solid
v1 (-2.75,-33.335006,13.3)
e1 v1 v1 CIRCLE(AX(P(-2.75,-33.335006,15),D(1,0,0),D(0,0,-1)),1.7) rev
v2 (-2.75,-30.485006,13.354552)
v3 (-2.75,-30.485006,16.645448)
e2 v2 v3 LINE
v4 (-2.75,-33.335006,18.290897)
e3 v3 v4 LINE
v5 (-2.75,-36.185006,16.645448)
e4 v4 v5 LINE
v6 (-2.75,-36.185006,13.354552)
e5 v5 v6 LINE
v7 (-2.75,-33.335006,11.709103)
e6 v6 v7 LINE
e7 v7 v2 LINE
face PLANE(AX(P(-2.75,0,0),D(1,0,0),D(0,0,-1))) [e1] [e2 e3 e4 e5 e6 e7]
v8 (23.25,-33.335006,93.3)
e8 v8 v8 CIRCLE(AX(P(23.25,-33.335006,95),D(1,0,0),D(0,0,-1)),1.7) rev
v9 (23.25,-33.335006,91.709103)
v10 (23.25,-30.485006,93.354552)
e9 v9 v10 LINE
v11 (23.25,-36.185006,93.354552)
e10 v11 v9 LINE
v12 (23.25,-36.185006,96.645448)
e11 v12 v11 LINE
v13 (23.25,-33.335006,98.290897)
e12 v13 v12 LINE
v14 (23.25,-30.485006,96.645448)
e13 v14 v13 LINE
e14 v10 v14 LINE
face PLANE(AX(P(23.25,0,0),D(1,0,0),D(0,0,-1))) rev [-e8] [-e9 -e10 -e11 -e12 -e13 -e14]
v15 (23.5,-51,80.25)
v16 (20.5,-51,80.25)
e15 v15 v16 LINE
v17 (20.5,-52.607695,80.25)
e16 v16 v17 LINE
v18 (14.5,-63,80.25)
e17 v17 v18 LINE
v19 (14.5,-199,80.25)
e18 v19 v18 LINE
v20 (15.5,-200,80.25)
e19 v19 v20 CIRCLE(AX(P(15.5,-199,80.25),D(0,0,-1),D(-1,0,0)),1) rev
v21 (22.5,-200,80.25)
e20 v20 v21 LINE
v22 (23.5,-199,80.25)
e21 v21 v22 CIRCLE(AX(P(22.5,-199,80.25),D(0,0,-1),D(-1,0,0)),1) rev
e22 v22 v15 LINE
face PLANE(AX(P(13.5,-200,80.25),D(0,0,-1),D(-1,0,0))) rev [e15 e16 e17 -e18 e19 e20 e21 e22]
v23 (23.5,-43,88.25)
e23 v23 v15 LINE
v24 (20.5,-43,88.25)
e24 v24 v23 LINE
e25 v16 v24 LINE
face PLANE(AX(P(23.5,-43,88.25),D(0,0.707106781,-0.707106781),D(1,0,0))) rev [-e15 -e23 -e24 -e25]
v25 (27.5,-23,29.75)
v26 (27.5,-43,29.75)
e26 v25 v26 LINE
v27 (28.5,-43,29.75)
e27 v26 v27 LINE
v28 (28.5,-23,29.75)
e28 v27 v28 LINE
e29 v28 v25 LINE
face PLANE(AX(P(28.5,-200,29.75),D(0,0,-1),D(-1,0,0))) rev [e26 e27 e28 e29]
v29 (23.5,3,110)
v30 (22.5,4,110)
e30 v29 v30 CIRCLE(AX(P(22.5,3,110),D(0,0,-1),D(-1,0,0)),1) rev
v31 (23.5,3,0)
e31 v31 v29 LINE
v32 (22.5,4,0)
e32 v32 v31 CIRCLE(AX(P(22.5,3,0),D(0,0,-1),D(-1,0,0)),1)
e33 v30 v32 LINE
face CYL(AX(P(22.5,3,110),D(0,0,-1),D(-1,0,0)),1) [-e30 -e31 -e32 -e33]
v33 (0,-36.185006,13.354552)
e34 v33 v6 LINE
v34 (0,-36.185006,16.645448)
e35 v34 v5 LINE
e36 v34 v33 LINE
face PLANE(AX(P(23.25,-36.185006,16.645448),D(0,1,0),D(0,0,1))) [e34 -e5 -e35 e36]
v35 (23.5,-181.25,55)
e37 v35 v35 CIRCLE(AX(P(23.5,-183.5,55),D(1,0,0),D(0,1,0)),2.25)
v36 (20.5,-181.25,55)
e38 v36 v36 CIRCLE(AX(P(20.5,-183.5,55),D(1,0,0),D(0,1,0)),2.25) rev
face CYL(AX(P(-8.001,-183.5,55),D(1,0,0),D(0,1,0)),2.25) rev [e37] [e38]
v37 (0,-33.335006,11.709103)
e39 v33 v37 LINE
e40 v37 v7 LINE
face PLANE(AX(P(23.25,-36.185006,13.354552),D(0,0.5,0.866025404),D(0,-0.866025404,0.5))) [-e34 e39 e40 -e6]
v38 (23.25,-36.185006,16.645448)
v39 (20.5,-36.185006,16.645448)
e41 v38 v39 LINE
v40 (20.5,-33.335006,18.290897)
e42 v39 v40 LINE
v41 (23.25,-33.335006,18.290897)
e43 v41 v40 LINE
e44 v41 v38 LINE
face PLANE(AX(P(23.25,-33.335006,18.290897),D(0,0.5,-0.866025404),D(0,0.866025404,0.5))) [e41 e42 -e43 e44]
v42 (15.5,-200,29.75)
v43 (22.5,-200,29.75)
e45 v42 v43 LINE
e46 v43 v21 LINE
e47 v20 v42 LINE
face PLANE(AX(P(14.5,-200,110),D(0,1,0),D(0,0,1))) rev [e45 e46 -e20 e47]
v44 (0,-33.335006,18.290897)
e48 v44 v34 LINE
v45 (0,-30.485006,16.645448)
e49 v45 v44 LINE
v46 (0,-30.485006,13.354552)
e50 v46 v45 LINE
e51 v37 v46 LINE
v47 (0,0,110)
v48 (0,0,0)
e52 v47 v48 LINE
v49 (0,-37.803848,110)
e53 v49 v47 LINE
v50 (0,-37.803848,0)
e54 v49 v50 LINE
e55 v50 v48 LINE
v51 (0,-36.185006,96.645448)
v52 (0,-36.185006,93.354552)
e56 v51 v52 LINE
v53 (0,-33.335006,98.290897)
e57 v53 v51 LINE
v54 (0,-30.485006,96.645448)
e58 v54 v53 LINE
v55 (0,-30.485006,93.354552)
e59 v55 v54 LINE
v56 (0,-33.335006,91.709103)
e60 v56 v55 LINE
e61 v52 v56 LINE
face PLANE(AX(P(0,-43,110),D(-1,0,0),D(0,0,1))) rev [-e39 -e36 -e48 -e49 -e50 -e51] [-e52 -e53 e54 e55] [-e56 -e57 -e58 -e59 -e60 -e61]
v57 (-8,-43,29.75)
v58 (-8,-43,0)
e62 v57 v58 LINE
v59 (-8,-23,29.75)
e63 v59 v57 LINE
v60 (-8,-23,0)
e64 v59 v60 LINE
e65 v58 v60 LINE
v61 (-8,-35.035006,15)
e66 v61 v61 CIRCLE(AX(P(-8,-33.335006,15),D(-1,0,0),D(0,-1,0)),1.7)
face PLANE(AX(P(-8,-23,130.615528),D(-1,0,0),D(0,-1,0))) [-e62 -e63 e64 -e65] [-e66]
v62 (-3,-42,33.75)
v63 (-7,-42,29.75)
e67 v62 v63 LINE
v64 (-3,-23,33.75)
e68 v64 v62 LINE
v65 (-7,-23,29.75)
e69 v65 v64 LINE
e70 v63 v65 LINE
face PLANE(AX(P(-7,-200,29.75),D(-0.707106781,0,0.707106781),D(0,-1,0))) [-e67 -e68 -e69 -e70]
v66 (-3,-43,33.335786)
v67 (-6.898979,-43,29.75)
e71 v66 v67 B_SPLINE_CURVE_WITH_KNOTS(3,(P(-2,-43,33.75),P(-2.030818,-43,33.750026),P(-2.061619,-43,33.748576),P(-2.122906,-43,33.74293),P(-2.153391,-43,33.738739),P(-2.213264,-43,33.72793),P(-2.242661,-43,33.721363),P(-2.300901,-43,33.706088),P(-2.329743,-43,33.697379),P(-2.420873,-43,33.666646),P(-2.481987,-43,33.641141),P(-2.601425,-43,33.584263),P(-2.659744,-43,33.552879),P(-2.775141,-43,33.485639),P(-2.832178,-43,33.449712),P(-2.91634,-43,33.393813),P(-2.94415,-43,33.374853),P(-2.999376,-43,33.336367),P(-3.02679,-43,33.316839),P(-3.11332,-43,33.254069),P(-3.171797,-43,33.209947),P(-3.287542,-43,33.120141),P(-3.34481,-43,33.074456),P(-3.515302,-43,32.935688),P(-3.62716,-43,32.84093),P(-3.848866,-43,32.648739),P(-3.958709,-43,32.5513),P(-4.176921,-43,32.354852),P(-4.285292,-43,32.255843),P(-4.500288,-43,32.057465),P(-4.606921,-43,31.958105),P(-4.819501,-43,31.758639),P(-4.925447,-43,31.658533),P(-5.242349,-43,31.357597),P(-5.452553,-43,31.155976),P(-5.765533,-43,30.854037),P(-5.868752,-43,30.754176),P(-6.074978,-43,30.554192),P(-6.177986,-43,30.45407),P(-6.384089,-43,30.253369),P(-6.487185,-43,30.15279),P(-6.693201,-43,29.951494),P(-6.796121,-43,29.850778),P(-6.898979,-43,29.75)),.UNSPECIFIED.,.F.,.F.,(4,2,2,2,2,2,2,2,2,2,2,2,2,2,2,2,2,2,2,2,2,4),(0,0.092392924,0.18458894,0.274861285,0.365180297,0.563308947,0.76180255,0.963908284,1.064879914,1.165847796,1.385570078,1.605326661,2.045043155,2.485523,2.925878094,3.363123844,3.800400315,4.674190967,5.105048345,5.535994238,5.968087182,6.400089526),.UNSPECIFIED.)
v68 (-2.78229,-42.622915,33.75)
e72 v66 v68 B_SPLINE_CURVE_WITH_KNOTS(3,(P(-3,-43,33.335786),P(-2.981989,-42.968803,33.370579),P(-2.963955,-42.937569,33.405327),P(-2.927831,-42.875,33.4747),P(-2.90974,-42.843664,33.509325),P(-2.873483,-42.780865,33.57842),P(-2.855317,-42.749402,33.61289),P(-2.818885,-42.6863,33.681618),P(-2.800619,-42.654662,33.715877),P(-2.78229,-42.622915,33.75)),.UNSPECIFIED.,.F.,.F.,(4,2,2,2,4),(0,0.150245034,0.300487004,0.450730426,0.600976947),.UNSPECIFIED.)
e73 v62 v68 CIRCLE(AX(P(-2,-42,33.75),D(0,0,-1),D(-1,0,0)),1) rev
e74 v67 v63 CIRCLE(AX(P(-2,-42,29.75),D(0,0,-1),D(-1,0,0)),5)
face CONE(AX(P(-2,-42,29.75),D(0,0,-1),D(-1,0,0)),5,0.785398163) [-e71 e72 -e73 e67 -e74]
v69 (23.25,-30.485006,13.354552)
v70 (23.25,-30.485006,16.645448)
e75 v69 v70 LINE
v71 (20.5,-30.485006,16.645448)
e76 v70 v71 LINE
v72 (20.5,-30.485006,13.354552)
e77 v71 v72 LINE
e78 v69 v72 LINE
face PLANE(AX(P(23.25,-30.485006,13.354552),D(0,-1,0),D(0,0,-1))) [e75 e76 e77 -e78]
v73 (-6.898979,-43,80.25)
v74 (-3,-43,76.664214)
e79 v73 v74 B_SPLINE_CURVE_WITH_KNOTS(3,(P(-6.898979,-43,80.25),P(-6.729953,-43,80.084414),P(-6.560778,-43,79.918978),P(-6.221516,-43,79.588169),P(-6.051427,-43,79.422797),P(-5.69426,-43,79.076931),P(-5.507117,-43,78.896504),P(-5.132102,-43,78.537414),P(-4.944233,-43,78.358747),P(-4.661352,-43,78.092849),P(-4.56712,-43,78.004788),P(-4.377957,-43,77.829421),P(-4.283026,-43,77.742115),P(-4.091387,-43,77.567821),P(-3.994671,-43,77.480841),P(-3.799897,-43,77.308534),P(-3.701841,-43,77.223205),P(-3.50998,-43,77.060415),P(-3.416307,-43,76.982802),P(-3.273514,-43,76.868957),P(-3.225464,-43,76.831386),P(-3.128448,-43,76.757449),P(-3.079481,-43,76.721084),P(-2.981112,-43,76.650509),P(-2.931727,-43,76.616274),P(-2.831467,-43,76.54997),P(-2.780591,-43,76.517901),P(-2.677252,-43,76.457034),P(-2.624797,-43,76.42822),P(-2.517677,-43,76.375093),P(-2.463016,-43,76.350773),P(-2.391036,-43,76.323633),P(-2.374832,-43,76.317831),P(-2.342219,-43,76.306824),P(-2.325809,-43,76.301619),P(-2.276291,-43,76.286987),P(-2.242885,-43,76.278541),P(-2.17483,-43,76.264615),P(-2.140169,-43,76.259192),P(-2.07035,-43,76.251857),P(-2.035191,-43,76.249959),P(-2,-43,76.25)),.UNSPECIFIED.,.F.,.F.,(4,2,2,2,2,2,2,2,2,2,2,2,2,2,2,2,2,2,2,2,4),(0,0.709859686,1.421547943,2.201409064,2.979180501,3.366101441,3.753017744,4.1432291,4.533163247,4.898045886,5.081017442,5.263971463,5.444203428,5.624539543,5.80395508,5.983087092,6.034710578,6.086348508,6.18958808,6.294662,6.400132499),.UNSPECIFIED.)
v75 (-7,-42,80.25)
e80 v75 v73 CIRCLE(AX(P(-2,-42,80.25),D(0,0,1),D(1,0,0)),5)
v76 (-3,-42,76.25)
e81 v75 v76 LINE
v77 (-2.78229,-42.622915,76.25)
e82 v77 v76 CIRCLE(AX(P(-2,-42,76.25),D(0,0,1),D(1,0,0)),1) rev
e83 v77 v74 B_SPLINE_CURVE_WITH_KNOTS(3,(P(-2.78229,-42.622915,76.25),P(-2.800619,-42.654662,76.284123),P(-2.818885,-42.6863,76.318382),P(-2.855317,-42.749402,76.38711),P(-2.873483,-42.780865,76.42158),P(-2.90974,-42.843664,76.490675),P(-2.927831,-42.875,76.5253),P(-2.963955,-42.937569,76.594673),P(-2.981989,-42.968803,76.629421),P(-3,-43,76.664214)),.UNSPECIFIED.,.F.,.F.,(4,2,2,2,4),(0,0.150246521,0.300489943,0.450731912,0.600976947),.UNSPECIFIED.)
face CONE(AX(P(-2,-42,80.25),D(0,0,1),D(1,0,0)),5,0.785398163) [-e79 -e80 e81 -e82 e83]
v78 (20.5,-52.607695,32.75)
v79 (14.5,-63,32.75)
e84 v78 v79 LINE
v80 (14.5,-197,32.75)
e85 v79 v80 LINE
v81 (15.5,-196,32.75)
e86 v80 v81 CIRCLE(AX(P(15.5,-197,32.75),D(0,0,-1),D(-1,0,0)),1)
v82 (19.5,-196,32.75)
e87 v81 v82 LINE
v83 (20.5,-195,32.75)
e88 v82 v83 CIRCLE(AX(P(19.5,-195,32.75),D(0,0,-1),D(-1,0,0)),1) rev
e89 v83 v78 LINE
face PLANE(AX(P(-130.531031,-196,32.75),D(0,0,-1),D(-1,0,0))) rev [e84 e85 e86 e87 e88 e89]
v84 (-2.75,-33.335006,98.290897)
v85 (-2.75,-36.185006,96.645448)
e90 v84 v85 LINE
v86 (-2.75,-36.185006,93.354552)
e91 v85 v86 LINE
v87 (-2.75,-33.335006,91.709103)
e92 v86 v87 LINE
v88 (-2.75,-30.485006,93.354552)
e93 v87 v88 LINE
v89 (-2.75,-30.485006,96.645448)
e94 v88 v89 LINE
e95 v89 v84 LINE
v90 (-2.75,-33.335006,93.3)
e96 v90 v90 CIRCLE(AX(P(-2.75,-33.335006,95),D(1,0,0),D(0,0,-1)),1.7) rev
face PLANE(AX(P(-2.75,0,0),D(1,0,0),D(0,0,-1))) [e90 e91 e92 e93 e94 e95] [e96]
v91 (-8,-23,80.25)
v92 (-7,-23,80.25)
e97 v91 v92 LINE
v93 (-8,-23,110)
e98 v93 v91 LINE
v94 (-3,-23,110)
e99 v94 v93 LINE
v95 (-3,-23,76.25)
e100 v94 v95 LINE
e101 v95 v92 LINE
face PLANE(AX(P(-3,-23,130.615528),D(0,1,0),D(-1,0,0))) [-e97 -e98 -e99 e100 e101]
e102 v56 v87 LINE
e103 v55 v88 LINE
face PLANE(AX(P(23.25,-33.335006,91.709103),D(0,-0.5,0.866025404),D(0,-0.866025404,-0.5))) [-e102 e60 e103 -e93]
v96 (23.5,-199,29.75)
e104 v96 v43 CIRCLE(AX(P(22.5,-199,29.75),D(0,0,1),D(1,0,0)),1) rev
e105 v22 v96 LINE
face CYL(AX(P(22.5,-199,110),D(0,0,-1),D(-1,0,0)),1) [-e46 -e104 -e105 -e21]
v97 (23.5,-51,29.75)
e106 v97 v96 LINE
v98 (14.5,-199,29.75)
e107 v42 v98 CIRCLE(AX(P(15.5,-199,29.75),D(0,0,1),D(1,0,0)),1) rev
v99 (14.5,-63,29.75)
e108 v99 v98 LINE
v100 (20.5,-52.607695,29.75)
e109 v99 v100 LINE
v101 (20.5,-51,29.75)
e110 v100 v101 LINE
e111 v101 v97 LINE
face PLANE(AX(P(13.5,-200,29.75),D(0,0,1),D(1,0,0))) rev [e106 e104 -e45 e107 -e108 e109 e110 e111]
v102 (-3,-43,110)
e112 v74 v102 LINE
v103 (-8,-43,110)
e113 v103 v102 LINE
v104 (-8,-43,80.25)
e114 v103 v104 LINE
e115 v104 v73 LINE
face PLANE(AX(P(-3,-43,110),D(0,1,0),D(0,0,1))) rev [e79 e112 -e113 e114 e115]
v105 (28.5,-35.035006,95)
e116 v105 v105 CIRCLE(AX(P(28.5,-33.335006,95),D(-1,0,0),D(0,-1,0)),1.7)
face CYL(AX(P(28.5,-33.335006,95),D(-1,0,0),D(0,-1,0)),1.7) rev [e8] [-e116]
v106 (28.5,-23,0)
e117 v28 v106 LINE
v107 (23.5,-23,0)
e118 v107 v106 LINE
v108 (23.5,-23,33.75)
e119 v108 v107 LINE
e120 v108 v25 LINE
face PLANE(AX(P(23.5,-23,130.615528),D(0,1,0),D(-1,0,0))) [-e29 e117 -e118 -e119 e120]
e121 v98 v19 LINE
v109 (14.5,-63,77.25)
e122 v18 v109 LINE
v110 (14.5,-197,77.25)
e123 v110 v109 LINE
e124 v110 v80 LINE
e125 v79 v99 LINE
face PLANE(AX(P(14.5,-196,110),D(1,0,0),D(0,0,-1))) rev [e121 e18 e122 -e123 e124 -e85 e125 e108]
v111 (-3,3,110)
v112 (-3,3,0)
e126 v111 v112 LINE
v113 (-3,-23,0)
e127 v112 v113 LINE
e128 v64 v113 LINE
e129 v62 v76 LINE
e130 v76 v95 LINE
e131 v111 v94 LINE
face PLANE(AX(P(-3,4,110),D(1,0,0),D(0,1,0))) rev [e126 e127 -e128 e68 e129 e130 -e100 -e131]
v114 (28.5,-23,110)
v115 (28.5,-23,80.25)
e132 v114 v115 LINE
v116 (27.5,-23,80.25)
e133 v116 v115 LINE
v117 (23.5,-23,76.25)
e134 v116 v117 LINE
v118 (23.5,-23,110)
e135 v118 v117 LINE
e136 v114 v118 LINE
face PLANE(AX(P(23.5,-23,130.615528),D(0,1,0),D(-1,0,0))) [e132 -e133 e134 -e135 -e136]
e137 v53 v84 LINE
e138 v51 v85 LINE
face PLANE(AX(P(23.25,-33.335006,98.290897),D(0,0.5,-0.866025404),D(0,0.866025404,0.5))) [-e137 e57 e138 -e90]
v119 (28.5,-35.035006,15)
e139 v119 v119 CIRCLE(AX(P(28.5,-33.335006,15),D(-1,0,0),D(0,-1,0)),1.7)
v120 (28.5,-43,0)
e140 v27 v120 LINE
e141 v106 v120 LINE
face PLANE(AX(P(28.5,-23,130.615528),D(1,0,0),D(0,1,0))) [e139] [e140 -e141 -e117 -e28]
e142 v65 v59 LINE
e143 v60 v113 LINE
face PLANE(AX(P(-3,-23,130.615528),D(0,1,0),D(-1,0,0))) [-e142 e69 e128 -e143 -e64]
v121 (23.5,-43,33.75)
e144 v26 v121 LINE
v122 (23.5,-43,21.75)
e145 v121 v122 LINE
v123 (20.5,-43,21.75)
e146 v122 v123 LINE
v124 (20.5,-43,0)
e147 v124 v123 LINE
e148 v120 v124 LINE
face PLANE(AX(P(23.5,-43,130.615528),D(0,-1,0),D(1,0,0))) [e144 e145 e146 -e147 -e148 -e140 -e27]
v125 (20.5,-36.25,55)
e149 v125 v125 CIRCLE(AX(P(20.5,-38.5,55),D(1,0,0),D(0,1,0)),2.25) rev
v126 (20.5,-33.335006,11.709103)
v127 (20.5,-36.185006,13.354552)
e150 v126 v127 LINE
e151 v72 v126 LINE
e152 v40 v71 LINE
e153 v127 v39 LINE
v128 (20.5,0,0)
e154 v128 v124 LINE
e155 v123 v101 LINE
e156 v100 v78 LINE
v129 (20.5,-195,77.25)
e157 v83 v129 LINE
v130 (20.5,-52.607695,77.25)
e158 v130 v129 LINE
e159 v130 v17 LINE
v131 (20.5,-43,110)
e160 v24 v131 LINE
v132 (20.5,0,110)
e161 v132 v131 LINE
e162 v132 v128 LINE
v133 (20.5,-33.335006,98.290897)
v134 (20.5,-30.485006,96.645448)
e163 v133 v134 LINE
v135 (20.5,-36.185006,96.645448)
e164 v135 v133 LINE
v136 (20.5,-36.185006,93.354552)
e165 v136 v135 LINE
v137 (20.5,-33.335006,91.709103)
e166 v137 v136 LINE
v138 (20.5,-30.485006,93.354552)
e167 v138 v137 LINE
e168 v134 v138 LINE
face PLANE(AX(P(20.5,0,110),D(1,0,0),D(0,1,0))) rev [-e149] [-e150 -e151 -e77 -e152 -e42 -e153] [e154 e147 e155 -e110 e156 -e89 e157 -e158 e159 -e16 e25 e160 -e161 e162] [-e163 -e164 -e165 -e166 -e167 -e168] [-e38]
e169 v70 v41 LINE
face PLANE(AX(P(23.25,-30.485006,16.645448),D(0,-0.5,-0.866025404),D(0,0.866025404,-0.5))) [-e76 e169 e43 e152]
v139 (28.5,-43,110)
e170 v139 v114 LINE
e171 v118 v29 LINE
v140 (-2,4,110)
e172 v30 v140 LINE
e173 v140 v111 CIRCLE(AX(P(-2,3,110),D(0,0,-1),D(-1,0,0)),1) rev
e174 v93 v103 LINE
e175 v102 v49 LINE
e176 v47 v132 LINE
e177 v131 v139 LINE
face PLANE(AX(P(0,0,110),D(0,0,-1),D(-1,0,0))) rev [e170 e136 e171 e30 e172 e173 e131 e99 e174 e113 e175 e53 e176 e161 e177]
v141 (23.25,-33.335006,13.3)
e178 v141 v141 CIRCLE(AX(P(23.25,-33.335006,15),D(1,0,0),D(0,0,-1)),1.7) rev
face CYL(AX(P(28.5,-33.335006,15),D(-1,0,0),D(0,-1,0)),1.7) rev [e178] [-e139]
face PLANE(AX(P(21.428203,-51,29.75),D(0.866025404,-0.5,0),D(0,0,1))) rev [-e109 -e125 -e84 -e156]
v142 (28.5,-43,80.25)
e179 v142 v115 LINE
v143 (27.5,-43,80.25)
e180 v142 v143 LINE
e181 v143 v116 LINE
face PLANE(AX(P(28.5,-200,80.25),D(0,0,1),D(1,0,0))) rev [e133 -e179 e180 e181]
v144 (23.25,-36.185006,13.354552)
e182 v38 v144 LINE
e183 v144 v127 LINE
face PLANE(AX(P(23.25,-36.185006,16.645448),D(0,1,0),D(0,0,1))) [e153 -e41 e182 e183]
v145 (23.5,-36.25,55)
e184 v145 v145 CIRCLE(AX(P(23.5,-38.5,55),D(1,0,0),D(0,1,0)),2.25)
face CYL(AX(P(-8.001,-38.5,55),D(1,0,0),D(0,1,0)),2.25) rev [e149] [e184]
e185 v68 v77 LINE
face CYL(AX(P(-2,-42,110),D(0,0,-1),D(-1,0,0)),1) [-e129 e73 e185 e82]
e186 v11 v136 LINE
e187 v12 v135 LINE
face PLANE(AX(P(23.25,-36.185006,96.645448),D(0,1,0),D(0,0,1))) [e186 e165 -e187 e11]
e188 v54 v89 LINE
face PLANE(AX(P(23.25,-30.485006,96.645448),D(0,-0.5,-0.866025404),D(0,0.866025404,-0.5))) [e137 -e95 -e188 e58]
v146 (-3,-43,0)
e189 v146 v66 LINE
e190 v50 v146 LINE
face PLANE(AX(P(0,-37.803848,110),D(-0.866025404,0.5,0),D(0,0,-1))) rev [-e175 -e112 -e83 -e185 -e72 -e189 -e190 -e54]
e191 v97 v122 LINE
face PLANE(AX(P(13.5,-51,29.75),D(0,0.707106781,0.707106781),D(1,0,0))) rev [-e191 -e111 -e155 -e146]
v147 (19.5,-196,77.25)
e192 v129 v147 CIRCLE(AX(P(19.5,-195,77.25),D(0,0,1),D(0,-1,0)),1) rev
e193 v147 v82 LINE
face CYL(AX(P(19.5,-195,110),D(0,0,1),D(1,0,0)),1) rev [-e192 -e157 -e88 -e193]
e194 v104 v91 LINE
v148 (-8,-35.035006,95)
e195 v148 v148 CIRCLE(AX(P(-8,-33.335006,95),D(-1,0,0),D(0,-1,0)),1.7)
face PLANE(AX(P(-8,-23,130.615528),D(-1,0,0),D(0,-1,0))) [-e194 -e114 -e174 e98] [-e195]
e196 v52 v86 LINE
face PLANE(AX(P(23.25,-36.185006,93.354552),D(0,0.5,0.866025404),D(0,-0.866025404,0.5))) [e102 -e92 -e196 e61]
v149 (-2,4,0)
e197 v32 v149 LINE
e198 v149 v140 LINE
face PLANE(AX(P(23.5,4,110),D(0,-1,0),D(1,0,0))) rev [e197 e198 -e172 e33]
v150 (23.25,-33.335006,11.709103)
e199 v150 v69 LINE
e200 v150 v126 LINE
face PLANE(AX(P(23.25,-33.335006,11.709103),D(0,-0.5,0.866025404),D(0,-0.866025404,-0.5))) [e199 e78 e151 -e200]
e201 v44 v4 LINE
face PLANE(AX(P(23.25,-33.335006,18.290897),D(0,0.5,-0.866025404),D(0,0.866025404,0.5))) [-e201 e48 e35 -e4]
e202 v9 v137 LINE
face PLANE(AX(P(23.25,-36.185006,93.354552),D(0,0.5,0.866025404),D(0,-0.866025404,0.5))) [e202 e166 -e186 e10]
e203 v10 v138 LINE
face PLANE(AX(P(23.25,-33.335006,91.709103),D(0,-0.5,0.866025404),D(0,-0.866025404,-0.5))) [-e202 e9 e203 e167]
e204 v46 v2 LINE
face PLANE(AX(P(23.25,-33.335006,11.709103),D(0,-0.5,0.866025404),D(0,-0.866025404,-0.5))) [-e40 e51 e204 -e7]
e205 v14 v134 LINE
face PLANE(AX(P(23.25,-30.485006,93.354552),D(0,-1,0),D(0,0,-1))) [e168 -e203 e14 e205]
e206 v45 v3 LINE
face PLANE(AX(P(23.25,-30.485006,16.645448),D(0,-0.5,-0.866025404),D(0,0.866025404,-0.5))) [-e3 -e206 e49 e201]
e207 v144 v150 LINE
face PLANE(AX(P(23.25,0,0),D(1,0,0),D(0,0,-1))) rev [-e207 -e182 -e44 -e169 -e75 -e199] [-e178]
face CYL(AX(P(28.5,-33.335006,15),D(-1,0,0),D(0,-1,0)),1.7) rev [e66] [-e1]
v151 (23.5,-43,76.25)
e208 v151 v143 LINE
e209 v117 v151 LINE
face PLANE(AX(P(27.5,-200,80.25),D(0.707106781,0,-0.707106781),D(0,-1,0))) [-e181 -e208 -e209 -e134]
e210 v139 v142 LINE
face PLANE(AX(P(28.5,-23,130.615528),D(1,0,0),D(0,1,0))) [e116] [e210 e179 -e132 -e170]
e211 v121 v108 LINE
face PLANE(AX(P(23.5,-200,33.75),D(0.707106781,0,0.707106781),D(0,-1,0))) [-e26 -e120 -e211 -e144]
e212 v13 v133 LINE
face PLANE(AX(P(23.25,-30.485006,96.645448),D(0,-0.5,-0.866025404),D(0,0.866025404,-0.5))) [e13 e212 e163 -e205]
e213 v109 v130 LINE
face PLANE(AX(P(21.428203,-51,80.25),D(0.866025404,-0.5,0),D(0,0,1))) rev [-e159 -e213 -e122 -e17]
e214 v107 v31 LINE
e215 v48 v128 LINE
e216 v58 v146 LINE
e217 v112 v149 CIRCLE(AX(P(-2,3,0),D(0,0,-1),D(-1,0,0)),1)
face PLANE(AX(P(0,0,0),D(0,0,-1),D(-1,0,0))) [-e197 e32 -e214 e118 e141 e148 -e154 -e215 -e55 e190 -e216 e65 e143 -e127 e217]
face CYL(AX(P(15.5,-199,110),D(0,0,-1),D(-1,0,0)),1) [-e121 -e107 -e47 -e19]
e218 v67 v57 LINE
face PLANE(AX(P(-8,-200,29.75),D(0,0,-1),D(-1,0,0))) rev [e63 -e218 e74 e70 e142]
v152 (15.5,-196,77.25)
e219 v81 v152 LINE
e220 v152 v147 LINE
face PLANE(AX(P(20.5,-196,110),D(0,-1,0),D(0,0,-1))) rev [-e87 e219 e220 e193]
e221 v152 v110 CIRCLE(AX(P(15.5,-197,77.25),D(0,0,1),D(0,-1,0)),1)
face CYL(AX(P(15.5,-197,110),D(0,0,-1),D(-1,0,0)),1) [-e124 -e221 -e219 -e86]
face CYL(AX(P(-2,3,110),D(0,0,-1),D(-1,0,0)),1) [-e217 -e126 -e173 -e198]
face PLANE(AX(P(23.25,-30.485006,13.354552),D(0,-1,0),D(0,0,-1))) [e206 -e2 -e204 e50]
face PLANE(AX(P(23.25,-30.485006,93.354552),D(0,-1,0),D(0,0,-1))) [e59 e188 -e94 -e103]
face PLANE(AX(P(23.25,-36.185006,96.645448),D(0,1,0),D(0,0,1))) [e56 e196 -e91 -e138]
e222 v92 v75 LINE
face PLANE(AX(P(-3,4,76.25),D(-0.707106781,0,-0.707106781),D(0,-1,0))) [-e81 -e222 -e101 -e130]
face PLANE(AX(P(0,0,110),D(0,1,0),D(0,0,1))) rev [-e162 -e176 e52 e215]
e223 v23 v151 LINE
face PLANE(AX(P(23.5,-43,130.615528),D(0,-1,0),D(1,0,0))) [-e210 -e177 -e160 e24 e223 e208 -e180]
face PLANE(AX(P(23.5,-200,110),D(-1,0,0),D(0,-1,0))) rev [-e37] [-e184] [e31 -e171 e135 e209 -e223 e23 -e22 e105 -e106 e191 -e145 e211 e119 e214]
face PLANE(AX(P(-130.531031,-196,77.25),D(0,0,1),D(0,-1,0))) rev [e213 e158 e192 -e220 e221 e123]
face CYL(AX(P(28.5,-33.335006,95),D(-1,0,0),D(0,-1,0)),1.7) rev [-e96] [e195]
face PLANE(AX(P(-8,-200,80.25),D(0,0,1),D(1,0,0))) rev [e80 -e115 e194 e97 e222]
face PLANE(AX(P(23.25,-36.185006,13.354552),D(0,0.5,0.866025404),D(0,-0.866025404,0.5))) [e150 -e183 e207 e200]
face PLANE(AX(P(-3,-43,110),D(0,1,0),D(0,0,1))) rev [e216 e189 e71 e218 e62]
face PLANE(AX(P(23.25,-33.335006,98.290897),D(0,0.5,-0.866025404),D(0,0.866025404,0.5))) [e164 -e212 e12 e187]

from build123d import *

# Parameters (mm, degrees)
EXTRUDE_1_DEPTH          = 110
SKETCH_3_W               = 5
SKETCH_3_H               = 20
EXTRUDE_2_DEPTH          = 110
CUT_EXTRUDE_1_REACH      = 232.418
SKETCH_2_R               = 2.25
SKETCH_5_W               = 5
SKETCH_5_H               = 50.5
CUT_EXTRUDE_2_DEPTH      = 234.512847612
SKETCH_6_W               = 29.75
SKETCH_6_H               = 157
CUT_EXTRUDE_3_DEPTH      = 10
SKETCH_7_W               = 3
SKETCH_7_H               = 145
EXTRUDE_3_DEPTH          = 6
FILLET_1_R               = 1
CHAMFER_1_SIZE           = 8
CHAMFER_2_SIZE           = 4
SKETCH_8_R               = 1.7
CUT_EXTRUDE_4_DEPTH      = 232.154169333
CUT_EXTRUDE_5_DEPTH      = 13
CUT_EXTRUDE_5_DEPTH_BACK = 13
CHAMFER_3_SIZE           = 12
CHAMFER_3_SIZE_2         = 6.92820323
CHAMFER_4_SIZE           = 5.196152423
CHAMFER_4_SIZE_2         = 3


with BuildPart() as part:
    # 草图1 → 凸台-拉伸1 (new body)
    with BuildSketch(Plane.XY):
        Polygon((0, 0), (20.5, 0), (20.5, -196), (14.5, -196), (14.5, -200), (23.5, -200), (23.5, 4), (-3, 4), (-3, -43), (0, -43), align=None)
    extrude(amount=EXTRUDE_1_DEPTH)

    # 草图3 → 凸台-拉伸2 (add)
    with BuildSketch(Plane(origin=(0, 0, 0), x_dir=(-1, 0, 0), z_dir=(0, 0, -1))):
        with Locations((-26, -33)):
            Rectangle(SKETCH_3_W, SKETCH_3_H)
        with Locations((5.5, -33)):
            Rectangle(SKETCH_3_W, SKETCH_3_H)
    extrude(amount=-EXTRUDE_2_DEPTH)

    # 草图2 → 切除-拉伸1 (cut, up to next)
    with BuildSketch(Plane(origin=(23.5, 0, 0), x_dir=(0, 0, -1), z_dir=(1, 0, 0)), mode=Mode.PRIVATE) as cut_extrude_1_sk1:
        with Locations(Location((-55, -38.5, 0), (0, 0, 90))):
            Circle(SKETCH_2_R)
    cut_extrude_1_tool1 = extrude(cut_extrude_1_sk1.sketch, amount=-CUT_EXTRUDE_1_REACH, mode=Mode.PRIVATE) & part.part
    # 草图2 → 切除-拉伸1 (cut, up to next)
    with BuildSketch(Plane(origin=(23.5, 0, 0), x_dir=(0, 0, -1), z_dir=(1, 0, 0)), mode=Mode.PRIVATE) as cut_extrude_1_sk2:
        with Locations(Location((-55, -183.5, 0), (0, 0, 90))):
            Circle(SKETCH_2_R)
    cut_extrude_1_tool2 = extrude(cut_extrude_1_sk2.sketch, amount=-CUT_EXTRUDE_1_REACH, mode=Mode.PRIVATE) & part.part
    add(cut_extrude_1_tool1.solids().sort_by_distance((23.5, -38.5, 55))[0], mode=Mode.SUBTRACT)
    add(cut_extrude_1_tool2.solids().sort_by_distance((23.5, -183.5, 55))[0], mode=Mode.SUBTRACT)

    # 草图5 → 切除-拉伸2 (cut, through all)
    with BuildSketch(Plane(origin=(0, 4, 0), x_dir=(1, 0, 0), z_dir=(0, 1, 0))):
        with Locations((-5.5, -55)):
            Rectangle(SKETCH_5_W, SKETCH_5_H)
        with Locations((26, -55)):
            Rectangle(SKETCH_5_W, SKETCH_5_H)
    extrude(amount=-CUT_EXTRUDE_2_DEPTH, mode=Mode.SUBTRACT)

    # 草图6 → 切除-拉伸3 (cut)
    with BuildSketch(Plane(origin=(23.5, 0, 0), x_dir=(0, 0, -1), z_dir=(1, 0, 0))):
        with Locations((-95.125, -121.5)):
            Rectangle(SKETCH_6_W, SKETCH_6_H)
        with Locations((-14.875, -121.5)):
            Rectangle(SKETCH_6_W, SKETCH_6_H)
    extrude(amount=-CUT_EXTRUDE_3_DEPTH, mode=Mode.SUBTRACT)

    # 草图7 → 凸台-拉伸3 (add)
    with BuildSketch(Plane.ZY.offset(-20.5)):
        with Locations((31.25, -123.5)):
            Rectangle(SKETCH_7_W, SKETCH_7_H)
        with Locations((78.75, -123.5)):
            Rectangle(SKETCH_7_W, SKETCH_7_H)
    extrude(amount=EXTRUDE_3_DEPTH)

    # 圆角1
    fillet_1_edges = [part.edges().sort_by_distance(p)[0] for p in [
        (23.5, -200, 55),
        (14.5, -200, 55),
        (-3, 4, 55),
        (23.5, 4, 55),
        (14.5, -196, 55),
        (20.5, -196, 55),
        (-3, -43, 55),
    ]]
    fillet(fillet_1_edges, radius=FILLET_1_R)

    # 倒角1
    chamfer_1_edges = [part.edges().sort_by_distance(p)[0] for p in [
        (22, -43, 80.25),
        (22, -43, 29.75),
    ]]
    chamfer(chamfer_1_edges, length=CHAMFER_1_SIZE)

    # 倒角2
    # the kernel refuses this chamfer: 4 mm, written as the material it adds along each edge
    with BuildSketch(Plane(origin=(-3, -23, 29.75), x_dir=(0.027495876610586726, 0, 0.9996219169112968), z_dir=(0, -1, 0))) as chamfer_2_piece_1:
        Polygon((CHAMFER_2_SIZE * 0.999621916911, CHAMFER_2_SIZE * 0.0274958766106), (-CHAMFER_2_SIZE * 0.0274958766106, CHAMFER_2_SIZE * 0.999621916911), (0, 0), align=None)
    extrude(amount=19)
    with BuildSketch(Plane(origin=(-3, -23, 80.25), x_dir=(0.027495876610584242, 0, -0.9996219169112968), z_dir=(0, -1, 0))) as chamfer_2_piece_2:
        Polygon((CHAMFER_2_SIZE * 0.999621916911, -CHAMFER_2_SIZE * 0.0274958766106), (-CHAMFER_2_SIZE * 0.0274958766106, -CHAMFER_2_SIZE * 0.999621916911), (0, 0), align=None)
    extrude(amount=19)
    with BuildSketch(Plane(origin=(-2, -42, 29.75), x_dir=(-0.9999802608561371, 0.0062831439655610674, 0), z_dir=(-0.0062831439655610674, -0.9999802608561371, 0))) as chamfer_2_piece_3_section:
        Polygon((-1 - CHAMFER_2_SIZE, 0), (-1, -CHAMFER_2_SIZE), (-1, 0), align=None)
    chamfer_2_piece_3 = revolve(axis=Axis((-2, -42, 29.75), (0, 0, -1)), revolution_arc=359.64, mode=Mode.PRIVATE)
    chamfer_2_piece_3 = split(chamfer_2_piece_3, bisect_by=Plane(origin=(0, -42.77460492, 31.688294831), z_dir=(-1, 0, 0)), keep=Keep.TOP, mode=Mode.PRIVATE)
    chamfer_2_piece_3 = split(chamfer_2_piece_3, bisect_by=Plane(origin=(-2.77460492, -43, 31.688294831), z_dir=(0, 1, 0)), keep=Keep.TOP, mode=Mode.PRIVATE)
    add(chamfer_2_piece_3)
    with BuildSketch(Plane(origin=(-2, -42, 80.25), x_dir=(-0.9999802608561371, 0.0062831439655610674, 0), z_dir=(-0.0062831439655610674, -0.9999802608561371, 0))) as chamfer_2_piece_4_section:
        Polygon((-1, CHAMFER_2_SIZE), (-1 - CHAMFER_2_SIZE, 0), (-1, 0), align=None)
    chamfer_2_piece_4 = revolve(axis=Axis((-2, -42, 80.25), (0, 0, -1)), revolution_arc=359.64, mode=Mode.PRIVATE)
    chamfer_2_piece_4 = split(chamfer_2_piece_4, bisect_by=Plane(origin=(0, -42.77460492, 78.31170517), z_dir=(-1, 0, 0)), keep=Keep.TOP, mode=Mode.PRIVATE)
    chamfer_2_piece_4 = split(chamfer_2_piece_4, bisect_by=Plane(origin=(-2.77460492, -43, 78.31170517), z_dir=(0, 1, 0)), keep=Keep.TOP, mode=Mode.PRIVATE)
    add(chamfer_2_piece_4)
    with BuildSketch(Plane(origin=(23.5, -23, 80.25), x_dir=(-0.027495876610602904, 0, -0.9996219169112963), z_dir=(0, -1, 0))) as chamfer_2_piece_5:
        Polygon((CHAMFER_2_SIZE * 0.999621916911, CHAMFER_2_SIZE * 0.0274958766106), (-CHAMFER_2_SIZE * 0.0274958766106, CHAMFER_2_SIZE * 0.999621916911), (0, 0), align=None)
    extrude(amount=20)
    with BuildSketch(Plane(origin=(23.5, -23, 29.75), x_dir=(-0.02749587661060549, 0, 0.9996219169112961), z_dir=(0, -1, 0))) as chamfer_2_piece_6:
        Polygon((CHAMFER_2_SIZE * 0.999621916911, -CHAMFER_2_SIZE * 0.0274958766106), (-CHAMFER_2_SIZE * 0.0274958766106, -CHAMFER_2_SIZE * 0.999621916911), (0, 0), align=None)
    extrude(amount=20)

    # 草图8 → 切除-拉伸4 (cut, through all)
    with BuildSketch(Plane.ZY.offset(8)):
        with Locations(Location((15, -33.335006201, 0), (0, 0, 270))):
            Circle(SKETCH_8_R)
        with Locations(Location((95, -33.335006201, 0), (0, 0, 270))):
            Circle(SKETCH_8_R)
    extrude(amount=-CUT_EXTRUDE_4_DEPTH, mode=Mode.SUBTRACT)

    # 草图9 → 切除-拉伸5 (cut, two sides: drawn at the far end of the back side and taken through both)
    with BuildSketch(Plane(origin=(10.25, 0, 0), x_dir=(0, 0, -1), z_dir=(1, 0, 0)).offset(-CUT_EXTRUDE_5_DEPTH_BACK)):
        Polygon((-93.354551733, -30.485006201), (-96.645448267, -30.485006201), (-98.290896534, -33.335006201), (-96.645448267, -36.185006201), (-93.354551733, -36.185006201), (-91.709103466, -33.335006201), align=None)
        Polygon((-13.354551733, -30.485006201), (-16.645448267, -30.485006201), (-18.290896534, -33.335006201), (-16.645448267, -36.185006201), (-13.354551733, -36.185006201), (-11.709103466, -33.335006201), align=None)
    extrude(amount=CUT_EXTRUDE_5_DEPTH + CUT_EXTRUDE_5_DEPTH_BACK, mode=Mode.SUBTRACT)

    # 倒角3
    # the kernel refuses this chamfer: 12, 6.92820323 mm, written as the material it takes off along each edge
    with BuildSketch(Plane(origin=(14.5, -51, 111.295029056), x_dir=(-0.019326765612700716, -0.9998132206222078, -4.736066806866801e-15), z_dir=(0, 0, -1))) as chamfer_3_piece_1_section:
        Polygon((CHAMFER_3_SIZE * 0.999813220622, -CHAMFER_3_SIZE * 0.0193267656127), (-CHAMFER_3_SIZE_2 * 0.0193267656135, -CHAMFER_3_SIZE_2 * 0.999813220662), (0, 0), align=None)
    chamfer_3_piece_1 = extrude(amount=65.090058112, mode=Mode.PRIVATE)
    chamfer_3_piece_1 = split(chamfer_3_piece_1, bisect_by=Plane(origin=(20.5, -55.138426071, 78.75), z_dir=(-1, 0, 0)), keep=Keep.TOP, mode=Mode.PRIVATE)
    add(chamfer_3_piece_1, mode=Mode.SUBTRACT)
    with BuildSketch(Plane(origin=(14.5, -51, 63.795029056), x_dir=(0.9983227437537925, 0.0578938624026711, 0), z_dir=(0, 0, -1))) as chamfer_3_piece_2_section:
        Polygon((CHAMFER_3_SIZE_2 * 0.998322743793, CHAMFER_3_SIZE_2 * 0.057893862405), (-CHAMFER_3_SIZE * 0.0578938624027, CHAMFER_3_SIZE * 0.998322743754), (0, 0), align=None)
    chamfer_3_piece_2 = extrude(amount=65.090058112, mode=Mode.PRIVATE)
    chamfer_3_piece_2 = split(chamfer_3_piece_2, bisect_by=Plane(origin=(20.5, -55.138426071, 31.25), z_dir=(-1, 0, 0)), keep=Keep.TOP, mode=Mode.PRIVATE)
    add(chamfer_3_piece_2, mode=Mode.SUBTRACT)

    # 倒角4
    # the kernel refuses this chamfer: 5.196152423, 3 mm, written as the material it takes off along each edge
    with BuildSketch(Plane(origin=(0, -43, 123.442891912), x_dir=(0.01932676561270063, 0.9998132206222079, 0), z_dir=(0, 0, -1))) as chamfer_4_piece_1:
        Polygon((CHAMFER_4_SIZE * 0.999813220566, -CHAMFER_4_SIZE * 0.0193267656116), (-CHAMFER_4_SIZE_2 * 0.0193267656127, -CHAMFER_4_SIZE_2 * 0.999813220622), (0, 0), align=None)
    extrude(amount=136.885783824, mode=Mode.SUBTRACT)


solid = part.part
